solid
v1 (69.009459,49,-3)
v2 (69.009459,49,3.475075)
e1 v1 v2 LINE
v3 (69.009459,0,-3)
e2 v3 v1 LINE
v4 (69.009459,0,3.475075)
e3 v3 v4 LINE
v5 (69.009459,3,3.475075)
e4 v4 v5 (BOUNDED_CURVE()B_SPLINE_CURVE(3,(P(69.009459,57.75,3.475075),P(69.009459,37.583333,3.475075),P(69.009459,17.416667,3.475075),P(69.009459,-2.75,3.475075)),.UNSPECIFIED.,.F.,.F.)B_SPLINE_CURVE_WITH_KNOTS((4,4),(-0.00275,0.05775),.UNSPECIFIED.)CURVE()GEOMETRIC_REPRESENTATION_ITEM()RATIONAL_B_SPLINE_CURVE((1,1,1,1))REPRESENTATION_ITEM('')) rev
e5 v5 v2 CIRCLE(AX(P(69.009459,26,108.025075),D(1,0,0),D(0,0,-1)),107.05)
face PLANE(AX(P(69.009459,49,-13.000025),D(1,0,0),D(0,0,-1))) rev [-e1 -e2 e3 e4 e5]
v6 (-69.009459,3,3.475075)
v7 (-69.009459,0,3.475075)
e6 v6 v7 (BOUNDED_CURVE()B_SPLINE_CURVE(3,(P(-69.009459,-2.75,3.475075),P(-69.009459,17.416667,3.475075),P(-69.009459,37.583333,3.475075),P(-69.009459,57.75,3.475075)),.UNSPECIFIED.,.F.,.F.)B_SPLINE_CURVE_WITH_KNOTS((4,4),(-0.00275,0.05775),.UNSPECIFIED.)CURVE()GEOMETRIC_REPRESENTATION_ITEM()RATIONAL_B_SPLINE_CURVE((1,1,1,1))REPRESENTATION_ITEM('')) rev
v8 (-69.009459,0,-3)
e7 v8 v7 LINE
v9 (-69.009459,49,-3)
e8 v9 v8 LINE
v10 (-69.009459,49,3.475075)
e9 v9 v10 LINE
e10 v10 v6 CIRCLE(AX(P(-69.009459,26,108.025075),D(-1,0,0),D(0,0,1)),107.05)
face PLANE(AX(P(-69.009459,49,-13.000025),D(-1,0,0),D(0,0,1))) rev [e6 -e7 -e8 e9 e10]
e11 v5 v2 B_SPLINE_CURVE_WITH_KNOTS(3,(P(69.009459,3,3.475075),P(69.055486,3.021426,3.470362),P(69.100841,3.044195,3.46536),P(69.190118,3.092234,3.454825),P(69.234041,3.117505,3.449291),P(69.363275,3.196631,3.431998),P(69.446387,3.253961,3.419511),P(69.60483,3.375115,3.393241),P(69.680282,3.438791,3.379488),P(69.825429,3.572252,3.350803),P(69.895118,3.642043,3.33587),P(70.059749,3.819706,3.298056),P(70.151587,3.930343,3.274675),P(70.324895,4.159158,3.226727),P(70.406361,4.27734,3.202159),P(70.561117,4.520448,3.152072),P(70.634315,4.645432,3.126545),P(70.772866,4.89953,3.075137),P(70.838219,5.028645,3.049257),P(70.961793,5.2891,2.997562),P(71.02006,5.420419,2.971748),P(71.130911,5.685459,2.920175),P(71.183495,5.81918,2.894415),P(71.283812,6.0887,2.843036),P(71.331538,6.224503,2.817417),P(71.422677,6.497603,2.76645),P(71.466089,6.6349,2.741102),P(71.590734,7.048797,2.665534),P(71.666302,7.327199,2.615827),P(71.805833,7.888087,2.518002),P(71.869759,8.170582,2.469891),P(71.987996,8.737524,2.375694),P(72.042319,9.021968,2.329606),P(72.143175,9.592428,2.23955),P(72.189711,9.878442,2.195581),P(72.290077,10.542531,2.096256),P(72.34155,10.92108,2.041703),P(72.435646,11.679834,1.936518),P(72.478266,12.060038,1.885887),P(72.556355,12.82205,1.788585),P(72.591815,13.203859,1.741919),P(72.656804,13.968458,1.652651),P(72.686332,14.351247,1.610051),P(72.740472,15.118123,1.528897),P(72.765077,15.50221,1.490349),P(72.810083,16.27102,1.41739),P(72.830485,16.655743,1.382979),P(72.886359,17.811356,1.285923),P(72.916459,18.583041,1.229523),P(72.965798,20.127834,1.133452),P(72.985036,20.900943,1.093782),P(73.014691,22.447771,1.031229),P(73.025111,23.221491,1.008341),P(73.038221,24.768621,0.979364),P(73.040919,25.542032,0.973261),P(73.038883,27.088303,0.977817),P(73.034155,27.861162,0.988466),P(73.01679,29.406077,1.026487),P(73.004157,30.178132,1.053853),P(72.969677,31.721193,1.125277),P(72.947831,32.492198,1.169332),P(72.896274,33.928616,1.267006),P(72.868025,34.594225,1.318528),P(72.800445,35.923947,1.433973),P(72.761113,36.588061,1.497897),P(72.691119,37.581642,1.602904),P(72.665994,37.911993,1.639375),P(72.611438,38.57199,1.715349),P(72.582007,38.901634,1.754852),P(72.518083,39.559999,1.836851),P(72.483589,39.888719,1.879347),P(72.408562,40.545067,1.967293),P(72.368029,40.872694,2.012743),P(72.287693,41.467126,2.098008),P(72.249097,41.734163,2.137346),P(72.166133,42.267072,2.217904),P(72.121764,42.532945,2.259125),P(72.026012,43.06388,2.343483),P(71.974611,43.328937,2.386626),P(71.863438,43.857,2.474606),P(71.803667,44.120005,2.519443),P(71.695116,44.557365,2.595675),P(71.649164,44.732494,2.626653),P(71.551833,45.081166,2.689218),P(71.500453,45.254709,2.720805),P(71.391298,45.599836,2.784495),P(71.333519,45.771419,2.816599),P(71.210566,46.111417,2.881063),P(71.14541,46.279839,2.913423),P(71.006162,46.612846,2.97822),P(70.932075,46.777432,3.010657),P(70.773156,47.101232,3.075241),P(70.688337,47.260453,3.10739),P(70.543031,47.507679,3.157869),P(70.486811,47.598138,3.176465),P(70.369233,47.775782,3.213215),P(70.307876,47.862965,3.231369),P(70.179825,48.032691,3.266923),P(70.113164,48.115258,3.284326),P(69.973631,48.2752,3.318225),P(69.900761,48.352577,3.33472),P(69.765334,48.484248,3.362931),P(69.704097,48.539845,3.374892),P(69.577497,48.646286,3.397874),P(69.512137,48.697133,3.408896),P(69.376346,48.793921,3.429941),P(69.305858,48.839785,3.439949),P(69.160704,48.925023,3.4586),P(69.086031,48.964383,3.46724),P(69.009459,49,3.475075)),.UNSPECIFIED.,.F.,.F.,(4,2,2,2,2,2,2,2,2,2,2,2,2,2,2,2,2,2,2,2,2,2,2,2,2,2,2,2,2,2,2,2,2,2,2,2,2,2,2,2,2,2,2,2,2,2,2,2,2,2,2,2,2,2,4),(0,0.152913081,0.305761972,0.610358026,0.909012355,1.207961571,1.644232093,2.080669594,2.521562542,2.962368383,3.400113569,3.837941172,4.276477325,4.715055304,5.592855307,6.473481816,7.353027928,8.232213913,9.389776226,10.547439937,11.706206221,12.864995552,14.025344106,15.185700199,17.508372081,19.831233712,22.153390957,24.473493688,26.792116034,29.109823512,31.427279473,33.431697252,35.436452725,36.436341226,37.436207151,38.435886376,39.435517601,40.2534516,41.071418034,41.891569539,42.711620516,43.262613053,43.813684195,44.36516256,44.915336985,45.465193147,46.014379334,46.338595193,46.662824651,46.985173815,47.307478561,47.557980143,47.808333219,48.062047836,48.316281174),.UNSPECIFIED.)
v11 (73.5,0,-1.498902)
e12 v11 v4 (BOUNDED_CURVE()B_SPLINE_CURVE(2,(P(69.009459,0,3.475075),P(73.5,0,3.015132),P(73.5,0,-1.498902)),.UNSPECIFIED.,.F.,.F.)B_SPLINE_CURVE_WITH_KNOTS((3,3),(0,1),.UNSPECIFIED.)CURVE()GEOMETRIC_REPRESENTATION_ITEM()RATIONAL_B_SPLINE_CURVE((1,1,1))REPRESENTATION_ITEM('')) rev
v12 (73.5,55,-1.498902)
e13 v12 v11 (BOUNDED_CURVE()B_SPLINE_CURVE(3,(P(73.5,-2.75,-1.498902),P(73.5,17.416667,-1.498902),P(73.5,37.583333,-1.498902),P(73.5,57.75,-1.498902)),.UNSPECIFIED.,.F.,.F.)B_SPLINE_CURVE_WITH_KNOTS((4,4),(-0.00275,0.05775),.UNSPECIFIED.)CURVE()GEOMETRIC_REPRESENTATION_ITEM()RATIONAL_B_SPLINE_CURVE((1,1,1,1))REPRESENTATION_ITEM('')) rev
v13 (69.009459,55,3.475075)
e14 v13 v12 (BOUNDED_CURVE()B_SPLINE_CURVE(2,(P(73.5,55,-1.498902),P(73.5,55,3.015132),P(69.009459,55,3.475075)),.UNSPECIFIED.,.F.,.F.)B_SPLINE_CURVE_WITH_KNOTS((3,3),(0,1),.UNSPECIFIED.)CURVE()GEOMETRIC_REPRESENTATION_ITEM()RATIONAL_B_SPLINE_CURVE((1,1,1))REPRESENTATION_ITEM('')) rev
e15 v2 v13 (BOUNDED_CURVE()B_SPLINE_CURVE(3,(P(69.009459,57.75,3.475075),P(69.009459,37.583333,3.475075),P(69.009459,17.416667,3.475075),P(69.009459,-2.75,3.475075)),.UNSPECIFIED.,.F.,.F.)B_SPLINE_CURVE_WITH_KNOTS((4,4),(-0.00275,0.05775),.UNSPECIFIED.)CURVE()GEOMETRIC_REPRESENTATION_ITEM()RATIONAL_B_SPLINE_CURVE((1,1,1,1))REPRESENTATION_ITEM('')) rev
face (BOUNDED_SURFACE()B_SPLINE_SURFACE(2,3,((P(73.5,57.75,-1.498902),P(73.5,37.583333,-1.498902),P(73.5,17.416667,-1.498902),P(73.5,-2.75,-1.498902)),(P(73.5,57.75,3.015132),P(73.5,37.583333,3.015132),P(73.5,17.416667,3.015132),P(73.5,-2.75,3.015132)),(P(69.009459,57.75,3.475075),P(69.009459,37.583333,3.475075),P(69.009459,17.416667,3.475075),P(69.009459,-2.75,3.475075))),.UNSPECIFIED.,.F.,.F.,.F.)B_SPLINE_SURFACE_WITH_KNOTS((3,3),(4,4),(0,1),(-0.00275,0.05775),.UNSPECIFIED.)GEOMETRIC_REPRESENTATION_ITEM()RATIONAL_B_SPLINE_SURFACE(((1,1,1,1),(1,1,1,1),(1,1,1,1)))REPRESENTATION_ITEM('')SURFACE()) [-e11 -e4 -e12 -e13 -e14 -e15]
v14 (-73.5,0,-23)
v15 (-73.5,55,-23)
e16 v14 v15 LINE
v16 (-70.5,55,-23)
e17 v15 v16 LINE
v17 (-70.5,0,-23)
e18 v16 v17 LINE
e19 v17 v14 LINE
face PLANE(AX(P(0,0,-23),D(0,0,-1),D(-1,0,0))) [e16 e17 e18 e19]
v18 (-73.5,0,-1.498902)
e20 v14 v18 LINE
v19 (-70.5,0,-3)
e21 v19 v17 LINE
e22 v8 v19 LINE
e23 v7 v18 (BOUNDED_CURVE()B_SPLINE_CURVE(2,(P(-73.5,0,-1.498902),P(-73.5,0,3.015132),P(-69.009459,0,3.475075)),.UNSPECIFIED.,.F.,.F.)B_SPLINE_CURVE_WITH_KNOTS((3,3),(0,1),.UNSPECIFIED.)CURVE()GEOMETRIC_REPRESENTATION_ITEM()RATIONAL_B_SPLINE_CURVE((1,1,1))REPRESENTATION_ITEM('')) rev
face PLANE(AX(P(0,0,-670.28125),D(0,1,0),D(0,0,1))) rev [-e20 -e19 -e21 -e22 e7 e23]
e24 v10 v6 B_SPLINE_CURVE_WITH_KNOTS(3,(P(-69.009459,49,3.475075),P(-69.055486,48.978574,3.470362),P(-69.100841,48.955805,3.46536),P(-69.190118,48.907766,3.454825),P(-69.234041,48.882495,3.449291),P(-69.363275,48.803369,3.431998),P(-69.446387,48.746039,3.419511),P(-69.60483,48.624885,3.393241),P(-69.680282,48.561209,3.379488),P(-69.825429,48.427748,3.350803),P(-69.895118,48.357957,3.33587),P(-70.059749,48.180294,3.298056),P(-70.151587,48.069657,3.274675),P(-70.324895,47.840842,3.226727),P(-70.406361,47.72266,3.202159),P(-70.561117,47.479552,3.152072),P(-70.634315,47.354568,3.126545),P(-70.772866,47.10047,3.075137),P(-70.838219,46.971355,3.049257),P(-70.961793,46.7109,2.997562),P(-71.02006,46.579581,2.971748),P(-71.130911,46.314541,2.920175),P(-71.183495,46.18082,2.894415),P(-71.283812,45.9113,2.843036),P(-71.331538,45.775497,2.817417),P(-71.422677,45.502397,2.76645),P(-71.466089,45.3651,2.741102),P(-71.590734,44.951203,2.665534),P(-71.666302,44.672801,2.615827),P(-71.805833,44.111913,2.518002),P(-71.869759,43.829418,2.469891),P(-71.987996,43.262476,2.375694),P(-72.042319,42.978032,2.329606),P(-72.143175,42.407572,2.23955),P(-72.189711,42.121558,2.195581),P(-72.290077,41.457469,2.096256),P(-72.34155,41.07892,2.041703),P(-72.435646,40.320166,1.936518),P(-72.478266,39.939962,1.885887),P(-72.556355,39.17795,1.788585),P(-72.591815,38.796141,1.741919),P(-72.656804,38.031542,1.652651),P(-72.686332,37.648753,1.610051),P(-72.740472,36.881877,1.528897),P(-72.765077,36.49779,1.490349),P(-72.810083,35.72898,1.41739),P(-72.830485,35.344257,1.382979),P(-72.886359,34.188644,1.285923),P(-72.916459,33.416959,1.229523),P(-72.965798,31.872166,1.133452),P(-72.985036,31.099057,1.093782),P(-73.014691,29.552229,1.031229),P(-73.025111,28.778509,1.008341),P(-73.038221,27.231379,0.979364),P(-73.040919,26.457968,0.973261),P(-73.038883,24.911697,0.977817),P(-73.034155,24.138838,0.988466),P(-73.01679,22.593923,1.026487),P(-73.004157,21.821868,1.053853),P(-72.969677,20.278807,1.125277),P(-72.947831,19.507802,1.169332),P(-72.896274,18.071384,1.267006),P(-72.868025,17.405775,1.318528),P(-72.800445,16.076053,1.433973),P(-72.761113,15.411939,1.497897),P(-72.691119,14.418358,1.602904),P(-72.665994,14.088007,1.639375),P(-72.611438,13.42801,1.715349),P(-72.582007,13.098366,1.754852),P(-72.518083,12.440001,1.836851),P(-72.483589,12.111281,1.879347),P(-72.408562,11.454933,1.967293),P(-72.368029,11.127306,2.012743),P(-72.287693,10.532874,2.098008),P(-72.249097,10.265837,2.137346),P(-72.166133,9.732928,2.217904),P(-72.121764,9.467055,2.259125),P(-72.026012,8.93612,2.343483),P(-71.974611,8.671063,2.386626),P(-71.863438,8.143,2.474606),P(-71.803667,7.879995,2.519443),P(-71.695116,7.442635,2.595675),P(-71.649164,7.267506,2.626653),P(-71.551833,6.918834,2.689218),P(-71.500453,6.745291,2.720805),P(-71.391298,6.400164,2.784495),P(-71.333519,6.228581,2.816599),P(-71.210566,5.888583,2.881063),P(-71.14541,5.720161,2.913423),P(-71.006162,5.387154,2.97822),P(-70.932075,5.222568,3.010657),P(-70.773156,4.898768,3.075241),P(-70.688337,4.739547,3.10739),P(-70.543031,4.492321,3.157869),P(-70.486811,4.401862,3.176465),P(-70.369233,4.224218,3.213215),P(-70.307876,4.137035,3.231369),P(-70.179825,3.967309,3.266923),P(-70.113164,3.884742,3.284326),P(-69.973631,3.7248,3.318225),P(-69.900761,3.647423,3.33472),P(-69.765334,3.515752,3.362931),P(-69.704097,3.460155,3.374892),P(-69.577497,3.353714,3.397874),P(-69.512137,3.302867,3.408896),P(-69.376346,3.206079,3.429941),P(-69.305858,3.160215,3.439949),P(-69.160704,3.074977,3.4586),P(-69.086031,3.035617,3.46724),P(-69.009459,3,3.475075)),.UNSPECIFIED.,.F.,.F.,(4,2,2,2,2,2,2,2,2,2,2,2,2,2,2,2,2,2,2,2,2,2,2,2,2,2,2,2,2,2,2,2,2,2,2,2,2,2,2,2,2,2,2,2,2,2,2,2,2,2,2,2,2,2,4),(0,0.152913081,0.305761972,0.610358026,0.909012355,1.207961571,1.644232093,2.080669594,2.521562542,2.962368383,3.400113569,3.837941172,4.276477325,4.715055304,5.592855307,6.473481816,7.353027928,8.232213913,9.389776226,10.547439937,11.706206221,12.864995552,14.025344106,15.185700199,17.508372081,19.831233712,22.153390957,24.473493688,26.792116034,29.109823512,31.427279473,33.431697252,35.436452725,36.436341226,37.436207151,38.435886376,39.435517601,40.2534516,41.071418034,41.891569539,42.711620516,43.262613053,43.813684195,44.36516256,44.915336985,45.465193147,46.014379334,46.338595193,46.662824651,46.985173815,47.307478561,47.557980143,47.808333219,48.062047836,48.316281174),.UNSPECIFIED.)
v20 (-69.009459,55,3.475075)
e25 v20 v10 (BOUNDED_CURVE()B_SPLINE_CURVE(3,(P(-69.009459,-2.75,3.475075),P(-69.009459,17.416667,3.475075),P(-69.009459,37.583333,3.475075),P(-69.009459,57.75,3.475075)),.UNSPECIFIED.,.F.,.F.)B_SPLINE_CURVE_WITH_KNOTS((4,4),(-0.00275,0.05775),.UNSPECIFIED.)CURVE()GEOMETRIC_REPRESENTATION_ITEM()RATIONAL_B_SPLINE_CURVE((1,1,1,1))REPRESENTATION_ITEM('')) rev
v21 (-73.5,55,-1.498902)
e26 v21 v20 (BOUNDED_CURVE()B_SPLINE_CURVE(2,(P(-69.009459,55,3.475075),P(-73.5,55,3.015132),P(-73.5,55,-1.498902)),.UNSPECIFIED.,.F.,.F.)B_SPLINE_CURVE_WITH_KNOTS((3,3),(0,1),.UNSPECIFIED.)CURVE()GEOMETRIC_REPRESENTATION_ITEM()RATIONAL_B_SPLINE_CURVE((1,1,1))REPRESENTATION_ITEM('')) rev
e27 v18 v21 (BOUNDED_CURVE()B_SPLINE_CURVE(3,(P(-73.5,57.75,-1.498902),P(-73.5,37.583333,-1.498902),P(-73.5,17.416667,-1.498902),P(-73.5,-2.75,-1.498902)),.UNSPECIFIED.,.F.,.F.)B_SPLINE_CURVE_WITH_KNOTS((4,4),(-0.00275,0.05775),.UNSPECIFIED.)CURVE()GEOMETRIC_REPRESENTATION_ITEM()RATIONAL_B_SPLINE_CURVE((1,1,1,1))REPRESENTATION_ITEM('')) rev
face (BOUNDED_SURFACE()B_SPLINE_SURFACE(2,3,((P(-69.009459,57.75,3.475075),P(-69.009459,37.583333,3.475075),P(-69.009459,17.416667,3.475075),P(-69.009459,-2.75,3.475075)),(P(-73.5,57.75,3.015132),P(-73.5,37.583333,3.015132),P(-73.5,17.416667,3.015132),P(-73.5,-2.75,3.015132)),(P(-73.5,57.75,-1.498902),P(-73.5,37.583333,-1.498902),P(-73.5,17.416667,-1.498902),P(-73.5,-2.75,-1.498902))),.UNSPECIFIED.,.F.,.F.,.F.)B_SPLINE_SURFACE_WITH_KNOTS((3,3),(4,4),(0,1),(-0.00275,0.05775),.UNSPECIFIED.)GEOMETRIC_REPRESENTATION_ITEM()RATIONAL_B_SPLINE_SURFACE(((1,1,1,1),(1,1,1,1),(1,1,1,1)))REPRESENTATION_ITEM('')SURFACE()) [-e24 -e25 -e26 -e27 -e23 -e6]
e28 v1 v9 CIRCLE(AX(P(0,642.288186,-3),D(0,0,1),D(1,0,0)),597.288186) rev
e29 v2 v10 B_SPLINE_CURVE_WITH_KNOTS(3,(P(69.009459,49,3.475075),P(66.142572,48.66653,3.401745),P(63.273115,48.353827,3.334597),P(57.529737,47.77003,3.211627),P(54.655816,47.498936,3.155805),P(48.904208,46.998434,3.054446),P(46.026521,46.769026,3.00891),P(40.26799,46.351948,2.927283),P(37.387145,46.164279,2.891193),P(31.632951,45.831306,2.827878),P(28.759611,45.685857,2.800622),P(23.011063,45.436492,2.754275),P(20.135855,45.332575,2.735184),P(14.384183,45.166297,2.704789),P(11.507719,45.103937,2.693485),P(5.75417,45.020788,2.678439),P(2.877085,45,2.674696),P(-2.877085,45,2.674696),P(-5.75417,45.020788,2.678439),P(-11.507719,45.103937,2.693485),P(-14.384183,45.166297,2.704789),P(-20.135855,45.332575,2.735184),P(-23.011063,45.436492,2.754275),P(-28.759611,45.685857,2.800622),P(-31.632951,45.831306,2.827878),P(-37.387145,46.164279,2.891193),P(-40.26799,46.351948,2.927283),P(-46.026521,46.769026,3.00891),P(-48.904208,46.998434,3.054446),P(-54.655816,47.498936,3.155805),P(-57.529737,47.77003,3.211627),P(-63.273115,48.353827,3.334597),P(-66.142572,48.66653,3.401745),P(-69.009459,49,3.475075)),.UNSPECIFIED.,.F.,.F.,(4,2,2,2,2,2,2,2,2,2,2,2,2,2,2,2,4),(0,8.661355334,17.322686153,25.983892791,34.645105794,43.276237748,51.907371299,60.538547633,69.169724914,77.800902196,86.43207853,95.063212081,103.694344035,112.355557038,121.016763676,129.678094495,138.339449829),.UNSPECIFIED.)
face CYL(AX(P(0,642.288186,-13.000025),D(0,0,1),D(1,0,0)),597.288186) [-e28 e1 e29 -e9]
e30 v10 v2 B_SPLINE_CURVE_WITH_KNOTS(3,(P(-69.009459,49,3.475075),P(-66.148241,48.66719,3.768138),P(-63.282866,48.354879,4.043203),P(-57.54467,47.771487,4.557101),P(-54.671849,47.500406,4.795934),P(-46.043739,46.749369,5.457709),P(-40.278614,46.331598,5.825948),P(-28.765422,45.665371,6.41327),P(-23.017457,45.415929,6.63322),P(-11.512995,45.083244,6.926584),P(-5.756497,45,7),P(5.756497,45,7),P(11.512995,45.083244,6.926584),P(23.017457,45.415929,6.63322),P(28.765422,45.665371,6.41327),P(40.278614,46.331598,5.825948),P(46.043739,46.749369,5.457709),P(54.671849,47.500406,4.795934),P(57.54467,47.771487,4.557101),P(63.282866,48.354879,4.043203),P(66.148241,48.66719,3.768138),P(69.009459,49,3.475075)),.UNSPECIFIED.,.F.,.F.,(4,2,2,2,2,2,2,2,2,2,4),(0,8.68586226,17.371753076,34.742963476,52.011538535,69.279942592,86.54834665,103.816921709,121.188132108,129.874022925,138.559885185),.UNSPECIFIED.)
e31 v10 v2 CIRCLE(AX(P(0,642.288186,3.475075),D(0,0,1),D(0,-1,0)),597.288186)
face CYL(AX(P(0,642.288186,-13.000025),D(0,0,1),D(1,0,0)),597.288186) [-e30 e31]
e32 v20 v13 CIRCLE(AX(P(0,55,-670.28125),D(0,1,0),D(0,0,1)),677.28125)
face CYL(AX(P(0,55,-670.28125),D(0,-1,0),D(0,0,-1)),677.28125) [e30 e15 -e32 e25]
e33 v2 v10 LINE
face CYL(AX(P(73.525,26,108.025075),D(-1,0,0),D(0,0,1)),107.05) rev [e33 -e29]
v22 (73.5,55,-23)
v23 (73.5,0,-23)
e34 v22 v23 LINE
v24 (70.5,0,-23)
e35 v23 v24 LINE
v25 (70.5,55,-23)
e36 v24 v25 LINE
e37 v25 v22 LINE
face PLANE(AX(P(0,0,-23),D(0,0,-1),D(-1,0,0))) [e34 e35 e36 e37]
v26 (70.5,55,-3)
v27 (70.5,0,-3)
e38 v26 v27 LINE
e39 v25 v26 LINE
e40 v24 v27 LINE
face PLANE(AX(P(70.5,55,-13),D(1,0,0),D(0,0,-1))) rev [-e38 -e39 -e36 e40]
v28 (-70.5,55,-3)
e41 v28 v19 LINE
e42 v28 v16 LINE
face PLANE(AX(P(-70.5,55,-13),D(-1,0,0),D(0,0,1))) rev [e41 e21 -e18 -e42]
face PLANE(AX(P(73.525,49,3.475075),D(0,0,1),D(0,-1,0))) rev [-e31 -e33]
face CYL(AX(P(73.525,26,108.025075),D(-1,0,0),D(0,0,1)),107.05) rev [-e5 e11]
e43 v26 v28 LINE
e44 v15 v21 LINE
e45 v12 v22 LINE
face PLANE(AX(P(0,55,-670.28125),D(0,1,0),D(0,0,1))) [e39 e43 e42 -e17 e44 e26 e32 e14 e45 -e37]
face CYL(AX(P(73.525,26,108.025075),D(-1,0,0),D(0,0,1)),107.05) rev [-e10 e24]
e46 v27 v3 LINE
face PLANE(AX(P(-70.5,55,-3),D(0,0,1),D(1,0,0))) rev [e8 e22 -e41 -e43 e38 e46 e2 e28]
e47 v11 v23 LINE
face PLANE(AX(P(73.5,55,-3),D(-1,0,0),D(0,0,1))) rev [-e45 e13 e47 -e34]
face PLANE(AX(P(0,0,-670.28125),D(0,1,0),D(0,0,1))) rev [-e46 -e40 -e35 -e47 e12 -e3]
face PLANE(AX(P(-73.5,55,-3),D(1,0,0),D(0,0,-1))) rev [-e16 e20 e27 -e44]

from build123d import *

# Parameters (mm, degrees)
BOSS_EXTRUDE1_DEPTH     = 55
CUT_EXTRUDE1_DEPTH      = 95.637466314
CUT_EXTRUDE1_DEPTH_BACK = 95.637466314
CUT_EXTRUDE2_DEPTH      = 158.489682338
CUT_EXTRUDE2_DEPTH_BACK = 158.489682338
SKETCH4_W               = 3
SKETCH4_H               = 55
BOSS_EXTRUDE2_DEPTH     = 10


with BuildPart() as part:
    # Sketch1 → Boss-Extrude1 (new body)
    with BuildSketch(Plane(origin=(0, 0, 0), x_dir=(1, 0, 0), z_dir=(0, 1, 0))):
        with BuildLine():
            Line((-73.5, 3), (-73.5, 13))
            Line((-73.5, 13), (-70.5, 13))
            Line((-70.5, 13), (-70.5, 3))
            Line((-70.5, 3), (70.5, 3))
            Line((70.5, 3), (70.5, 13))
            Line((70.5, 13), (73.5, 13))
            Line((73.5, 13), (73.5, 3))
            Line((73.5, 3), (73.5, -3))
            ThreePointArc((73.5, -3), (0, -7), (-73.5, -3))
            Line((-73.5, -3), (-73.5, 3))
        make_face()
    extrude(amount=BOSS_EXTRUDE1_DEPTH)

    # Fillet1
    # a fillet whose section is not a circle: 5 mm, written as the material it takes off along each edge
    with BuildSketch(Plane(origin=(73.5, -11.289002285, 3), x_dir=(0, 0, -1), z_dir=(0, 1, 0))) as fillet1_piece_1:
        with BuildLine():
            Bezier((4.498901921, 0), (-0.015132067, 0), (-0.475075473, 4.490540603), weights=[1, 1, 1])
            ThreePointArc((-0.475075473, 4.490540603), (-0.24128019, 2.24487437), (0, 0))
            Line((0, 0), (4.498901921, 0))
        make_face()
    extrude(amount=77.578004571, mode=Mode.SUBTRACT)
    with BuildSketch(Plane(origin=(-73.5, -11.289002285, 3), x_dir=(0, 0, -1), z_dir=(0, 1, 0))) as fillet1_piece_2:
        with BuildLine():
            Bezier((4.498901921, 0), (-0.015132067, 0), (-0.475075473, -4.490540603), weights=[1, 1, 1])
            ThreePointArc((-0.475075473, -4.490540603), (-0.24128019, -2.24487437), (0, 0))
            Line((0, 0), (4.498901921, 0))
        make_face()
    extrude(amount=77.578004571, mode=Mode.SUBTRACT)

    # Sketch2 → Cut-Extrude1 (cut, two sides: drawn at the far end of the back side and taken through both)
    with BuildSketch(Plane.XY.offset(10).offset(-CUT_EXTRUDE1_DEPTH_BACK)):
        with BuildLine():
            Line((-69.009459397, 49), (-69.009459397, 0))
            Line((-69.009459397, 0), (69.009459397, 0))
            Line((69.009459397, 0), (69.009459397, 49))
            ThreePointArc((69.009459397, 49), (0, 45), (-69.009459397, 49))
        make_face()
    extrude(amount=CUT_EXTRUDE1_DEPTH + CUT_EXTRUDE1_DEPTH_BACK, mode=Mode.SUBTRACT)

    # Sketch3 → Cut-Extrude2 (cut, two sides: drawn at the far end of the back side and taken through both)
    with BuildSketch(Plane.ZY.offset(73.5).offset(-CUT_EXTRUDE2_DEPTH_BACK)):
        with BuildLine():
            Line((3.475075473, 49), (3.475075473, 3))
            ThreePointArc((3.475075473, 3), (0.975075473, 26), (3.475075473, 49))
        make_face()
    extrude(amount=CUT_EXTRUDE2_DEPTH + CUT_EXTRUDE2_DEPTH_BACK, mode=Mode.SUBTRACT)

    # Sketch4 → Boss-Extrude2 (add)
    with BuildSketch(Plane(origin=(0, 0, -13), x_dir=(-1, 0, 0), z_dir=(0, 0, -1))):
        with Locations((72, 27.5)):
            Rectangle(SKETCH4_W, SKETCH4_H)
        with Locations((-72, 27.5)):
            Rectangle(SKETCH4_W, SKETCH4_H)
    extrude(amount=BOSS_EXTRUDE2_DEPTH)


solid = part.part
